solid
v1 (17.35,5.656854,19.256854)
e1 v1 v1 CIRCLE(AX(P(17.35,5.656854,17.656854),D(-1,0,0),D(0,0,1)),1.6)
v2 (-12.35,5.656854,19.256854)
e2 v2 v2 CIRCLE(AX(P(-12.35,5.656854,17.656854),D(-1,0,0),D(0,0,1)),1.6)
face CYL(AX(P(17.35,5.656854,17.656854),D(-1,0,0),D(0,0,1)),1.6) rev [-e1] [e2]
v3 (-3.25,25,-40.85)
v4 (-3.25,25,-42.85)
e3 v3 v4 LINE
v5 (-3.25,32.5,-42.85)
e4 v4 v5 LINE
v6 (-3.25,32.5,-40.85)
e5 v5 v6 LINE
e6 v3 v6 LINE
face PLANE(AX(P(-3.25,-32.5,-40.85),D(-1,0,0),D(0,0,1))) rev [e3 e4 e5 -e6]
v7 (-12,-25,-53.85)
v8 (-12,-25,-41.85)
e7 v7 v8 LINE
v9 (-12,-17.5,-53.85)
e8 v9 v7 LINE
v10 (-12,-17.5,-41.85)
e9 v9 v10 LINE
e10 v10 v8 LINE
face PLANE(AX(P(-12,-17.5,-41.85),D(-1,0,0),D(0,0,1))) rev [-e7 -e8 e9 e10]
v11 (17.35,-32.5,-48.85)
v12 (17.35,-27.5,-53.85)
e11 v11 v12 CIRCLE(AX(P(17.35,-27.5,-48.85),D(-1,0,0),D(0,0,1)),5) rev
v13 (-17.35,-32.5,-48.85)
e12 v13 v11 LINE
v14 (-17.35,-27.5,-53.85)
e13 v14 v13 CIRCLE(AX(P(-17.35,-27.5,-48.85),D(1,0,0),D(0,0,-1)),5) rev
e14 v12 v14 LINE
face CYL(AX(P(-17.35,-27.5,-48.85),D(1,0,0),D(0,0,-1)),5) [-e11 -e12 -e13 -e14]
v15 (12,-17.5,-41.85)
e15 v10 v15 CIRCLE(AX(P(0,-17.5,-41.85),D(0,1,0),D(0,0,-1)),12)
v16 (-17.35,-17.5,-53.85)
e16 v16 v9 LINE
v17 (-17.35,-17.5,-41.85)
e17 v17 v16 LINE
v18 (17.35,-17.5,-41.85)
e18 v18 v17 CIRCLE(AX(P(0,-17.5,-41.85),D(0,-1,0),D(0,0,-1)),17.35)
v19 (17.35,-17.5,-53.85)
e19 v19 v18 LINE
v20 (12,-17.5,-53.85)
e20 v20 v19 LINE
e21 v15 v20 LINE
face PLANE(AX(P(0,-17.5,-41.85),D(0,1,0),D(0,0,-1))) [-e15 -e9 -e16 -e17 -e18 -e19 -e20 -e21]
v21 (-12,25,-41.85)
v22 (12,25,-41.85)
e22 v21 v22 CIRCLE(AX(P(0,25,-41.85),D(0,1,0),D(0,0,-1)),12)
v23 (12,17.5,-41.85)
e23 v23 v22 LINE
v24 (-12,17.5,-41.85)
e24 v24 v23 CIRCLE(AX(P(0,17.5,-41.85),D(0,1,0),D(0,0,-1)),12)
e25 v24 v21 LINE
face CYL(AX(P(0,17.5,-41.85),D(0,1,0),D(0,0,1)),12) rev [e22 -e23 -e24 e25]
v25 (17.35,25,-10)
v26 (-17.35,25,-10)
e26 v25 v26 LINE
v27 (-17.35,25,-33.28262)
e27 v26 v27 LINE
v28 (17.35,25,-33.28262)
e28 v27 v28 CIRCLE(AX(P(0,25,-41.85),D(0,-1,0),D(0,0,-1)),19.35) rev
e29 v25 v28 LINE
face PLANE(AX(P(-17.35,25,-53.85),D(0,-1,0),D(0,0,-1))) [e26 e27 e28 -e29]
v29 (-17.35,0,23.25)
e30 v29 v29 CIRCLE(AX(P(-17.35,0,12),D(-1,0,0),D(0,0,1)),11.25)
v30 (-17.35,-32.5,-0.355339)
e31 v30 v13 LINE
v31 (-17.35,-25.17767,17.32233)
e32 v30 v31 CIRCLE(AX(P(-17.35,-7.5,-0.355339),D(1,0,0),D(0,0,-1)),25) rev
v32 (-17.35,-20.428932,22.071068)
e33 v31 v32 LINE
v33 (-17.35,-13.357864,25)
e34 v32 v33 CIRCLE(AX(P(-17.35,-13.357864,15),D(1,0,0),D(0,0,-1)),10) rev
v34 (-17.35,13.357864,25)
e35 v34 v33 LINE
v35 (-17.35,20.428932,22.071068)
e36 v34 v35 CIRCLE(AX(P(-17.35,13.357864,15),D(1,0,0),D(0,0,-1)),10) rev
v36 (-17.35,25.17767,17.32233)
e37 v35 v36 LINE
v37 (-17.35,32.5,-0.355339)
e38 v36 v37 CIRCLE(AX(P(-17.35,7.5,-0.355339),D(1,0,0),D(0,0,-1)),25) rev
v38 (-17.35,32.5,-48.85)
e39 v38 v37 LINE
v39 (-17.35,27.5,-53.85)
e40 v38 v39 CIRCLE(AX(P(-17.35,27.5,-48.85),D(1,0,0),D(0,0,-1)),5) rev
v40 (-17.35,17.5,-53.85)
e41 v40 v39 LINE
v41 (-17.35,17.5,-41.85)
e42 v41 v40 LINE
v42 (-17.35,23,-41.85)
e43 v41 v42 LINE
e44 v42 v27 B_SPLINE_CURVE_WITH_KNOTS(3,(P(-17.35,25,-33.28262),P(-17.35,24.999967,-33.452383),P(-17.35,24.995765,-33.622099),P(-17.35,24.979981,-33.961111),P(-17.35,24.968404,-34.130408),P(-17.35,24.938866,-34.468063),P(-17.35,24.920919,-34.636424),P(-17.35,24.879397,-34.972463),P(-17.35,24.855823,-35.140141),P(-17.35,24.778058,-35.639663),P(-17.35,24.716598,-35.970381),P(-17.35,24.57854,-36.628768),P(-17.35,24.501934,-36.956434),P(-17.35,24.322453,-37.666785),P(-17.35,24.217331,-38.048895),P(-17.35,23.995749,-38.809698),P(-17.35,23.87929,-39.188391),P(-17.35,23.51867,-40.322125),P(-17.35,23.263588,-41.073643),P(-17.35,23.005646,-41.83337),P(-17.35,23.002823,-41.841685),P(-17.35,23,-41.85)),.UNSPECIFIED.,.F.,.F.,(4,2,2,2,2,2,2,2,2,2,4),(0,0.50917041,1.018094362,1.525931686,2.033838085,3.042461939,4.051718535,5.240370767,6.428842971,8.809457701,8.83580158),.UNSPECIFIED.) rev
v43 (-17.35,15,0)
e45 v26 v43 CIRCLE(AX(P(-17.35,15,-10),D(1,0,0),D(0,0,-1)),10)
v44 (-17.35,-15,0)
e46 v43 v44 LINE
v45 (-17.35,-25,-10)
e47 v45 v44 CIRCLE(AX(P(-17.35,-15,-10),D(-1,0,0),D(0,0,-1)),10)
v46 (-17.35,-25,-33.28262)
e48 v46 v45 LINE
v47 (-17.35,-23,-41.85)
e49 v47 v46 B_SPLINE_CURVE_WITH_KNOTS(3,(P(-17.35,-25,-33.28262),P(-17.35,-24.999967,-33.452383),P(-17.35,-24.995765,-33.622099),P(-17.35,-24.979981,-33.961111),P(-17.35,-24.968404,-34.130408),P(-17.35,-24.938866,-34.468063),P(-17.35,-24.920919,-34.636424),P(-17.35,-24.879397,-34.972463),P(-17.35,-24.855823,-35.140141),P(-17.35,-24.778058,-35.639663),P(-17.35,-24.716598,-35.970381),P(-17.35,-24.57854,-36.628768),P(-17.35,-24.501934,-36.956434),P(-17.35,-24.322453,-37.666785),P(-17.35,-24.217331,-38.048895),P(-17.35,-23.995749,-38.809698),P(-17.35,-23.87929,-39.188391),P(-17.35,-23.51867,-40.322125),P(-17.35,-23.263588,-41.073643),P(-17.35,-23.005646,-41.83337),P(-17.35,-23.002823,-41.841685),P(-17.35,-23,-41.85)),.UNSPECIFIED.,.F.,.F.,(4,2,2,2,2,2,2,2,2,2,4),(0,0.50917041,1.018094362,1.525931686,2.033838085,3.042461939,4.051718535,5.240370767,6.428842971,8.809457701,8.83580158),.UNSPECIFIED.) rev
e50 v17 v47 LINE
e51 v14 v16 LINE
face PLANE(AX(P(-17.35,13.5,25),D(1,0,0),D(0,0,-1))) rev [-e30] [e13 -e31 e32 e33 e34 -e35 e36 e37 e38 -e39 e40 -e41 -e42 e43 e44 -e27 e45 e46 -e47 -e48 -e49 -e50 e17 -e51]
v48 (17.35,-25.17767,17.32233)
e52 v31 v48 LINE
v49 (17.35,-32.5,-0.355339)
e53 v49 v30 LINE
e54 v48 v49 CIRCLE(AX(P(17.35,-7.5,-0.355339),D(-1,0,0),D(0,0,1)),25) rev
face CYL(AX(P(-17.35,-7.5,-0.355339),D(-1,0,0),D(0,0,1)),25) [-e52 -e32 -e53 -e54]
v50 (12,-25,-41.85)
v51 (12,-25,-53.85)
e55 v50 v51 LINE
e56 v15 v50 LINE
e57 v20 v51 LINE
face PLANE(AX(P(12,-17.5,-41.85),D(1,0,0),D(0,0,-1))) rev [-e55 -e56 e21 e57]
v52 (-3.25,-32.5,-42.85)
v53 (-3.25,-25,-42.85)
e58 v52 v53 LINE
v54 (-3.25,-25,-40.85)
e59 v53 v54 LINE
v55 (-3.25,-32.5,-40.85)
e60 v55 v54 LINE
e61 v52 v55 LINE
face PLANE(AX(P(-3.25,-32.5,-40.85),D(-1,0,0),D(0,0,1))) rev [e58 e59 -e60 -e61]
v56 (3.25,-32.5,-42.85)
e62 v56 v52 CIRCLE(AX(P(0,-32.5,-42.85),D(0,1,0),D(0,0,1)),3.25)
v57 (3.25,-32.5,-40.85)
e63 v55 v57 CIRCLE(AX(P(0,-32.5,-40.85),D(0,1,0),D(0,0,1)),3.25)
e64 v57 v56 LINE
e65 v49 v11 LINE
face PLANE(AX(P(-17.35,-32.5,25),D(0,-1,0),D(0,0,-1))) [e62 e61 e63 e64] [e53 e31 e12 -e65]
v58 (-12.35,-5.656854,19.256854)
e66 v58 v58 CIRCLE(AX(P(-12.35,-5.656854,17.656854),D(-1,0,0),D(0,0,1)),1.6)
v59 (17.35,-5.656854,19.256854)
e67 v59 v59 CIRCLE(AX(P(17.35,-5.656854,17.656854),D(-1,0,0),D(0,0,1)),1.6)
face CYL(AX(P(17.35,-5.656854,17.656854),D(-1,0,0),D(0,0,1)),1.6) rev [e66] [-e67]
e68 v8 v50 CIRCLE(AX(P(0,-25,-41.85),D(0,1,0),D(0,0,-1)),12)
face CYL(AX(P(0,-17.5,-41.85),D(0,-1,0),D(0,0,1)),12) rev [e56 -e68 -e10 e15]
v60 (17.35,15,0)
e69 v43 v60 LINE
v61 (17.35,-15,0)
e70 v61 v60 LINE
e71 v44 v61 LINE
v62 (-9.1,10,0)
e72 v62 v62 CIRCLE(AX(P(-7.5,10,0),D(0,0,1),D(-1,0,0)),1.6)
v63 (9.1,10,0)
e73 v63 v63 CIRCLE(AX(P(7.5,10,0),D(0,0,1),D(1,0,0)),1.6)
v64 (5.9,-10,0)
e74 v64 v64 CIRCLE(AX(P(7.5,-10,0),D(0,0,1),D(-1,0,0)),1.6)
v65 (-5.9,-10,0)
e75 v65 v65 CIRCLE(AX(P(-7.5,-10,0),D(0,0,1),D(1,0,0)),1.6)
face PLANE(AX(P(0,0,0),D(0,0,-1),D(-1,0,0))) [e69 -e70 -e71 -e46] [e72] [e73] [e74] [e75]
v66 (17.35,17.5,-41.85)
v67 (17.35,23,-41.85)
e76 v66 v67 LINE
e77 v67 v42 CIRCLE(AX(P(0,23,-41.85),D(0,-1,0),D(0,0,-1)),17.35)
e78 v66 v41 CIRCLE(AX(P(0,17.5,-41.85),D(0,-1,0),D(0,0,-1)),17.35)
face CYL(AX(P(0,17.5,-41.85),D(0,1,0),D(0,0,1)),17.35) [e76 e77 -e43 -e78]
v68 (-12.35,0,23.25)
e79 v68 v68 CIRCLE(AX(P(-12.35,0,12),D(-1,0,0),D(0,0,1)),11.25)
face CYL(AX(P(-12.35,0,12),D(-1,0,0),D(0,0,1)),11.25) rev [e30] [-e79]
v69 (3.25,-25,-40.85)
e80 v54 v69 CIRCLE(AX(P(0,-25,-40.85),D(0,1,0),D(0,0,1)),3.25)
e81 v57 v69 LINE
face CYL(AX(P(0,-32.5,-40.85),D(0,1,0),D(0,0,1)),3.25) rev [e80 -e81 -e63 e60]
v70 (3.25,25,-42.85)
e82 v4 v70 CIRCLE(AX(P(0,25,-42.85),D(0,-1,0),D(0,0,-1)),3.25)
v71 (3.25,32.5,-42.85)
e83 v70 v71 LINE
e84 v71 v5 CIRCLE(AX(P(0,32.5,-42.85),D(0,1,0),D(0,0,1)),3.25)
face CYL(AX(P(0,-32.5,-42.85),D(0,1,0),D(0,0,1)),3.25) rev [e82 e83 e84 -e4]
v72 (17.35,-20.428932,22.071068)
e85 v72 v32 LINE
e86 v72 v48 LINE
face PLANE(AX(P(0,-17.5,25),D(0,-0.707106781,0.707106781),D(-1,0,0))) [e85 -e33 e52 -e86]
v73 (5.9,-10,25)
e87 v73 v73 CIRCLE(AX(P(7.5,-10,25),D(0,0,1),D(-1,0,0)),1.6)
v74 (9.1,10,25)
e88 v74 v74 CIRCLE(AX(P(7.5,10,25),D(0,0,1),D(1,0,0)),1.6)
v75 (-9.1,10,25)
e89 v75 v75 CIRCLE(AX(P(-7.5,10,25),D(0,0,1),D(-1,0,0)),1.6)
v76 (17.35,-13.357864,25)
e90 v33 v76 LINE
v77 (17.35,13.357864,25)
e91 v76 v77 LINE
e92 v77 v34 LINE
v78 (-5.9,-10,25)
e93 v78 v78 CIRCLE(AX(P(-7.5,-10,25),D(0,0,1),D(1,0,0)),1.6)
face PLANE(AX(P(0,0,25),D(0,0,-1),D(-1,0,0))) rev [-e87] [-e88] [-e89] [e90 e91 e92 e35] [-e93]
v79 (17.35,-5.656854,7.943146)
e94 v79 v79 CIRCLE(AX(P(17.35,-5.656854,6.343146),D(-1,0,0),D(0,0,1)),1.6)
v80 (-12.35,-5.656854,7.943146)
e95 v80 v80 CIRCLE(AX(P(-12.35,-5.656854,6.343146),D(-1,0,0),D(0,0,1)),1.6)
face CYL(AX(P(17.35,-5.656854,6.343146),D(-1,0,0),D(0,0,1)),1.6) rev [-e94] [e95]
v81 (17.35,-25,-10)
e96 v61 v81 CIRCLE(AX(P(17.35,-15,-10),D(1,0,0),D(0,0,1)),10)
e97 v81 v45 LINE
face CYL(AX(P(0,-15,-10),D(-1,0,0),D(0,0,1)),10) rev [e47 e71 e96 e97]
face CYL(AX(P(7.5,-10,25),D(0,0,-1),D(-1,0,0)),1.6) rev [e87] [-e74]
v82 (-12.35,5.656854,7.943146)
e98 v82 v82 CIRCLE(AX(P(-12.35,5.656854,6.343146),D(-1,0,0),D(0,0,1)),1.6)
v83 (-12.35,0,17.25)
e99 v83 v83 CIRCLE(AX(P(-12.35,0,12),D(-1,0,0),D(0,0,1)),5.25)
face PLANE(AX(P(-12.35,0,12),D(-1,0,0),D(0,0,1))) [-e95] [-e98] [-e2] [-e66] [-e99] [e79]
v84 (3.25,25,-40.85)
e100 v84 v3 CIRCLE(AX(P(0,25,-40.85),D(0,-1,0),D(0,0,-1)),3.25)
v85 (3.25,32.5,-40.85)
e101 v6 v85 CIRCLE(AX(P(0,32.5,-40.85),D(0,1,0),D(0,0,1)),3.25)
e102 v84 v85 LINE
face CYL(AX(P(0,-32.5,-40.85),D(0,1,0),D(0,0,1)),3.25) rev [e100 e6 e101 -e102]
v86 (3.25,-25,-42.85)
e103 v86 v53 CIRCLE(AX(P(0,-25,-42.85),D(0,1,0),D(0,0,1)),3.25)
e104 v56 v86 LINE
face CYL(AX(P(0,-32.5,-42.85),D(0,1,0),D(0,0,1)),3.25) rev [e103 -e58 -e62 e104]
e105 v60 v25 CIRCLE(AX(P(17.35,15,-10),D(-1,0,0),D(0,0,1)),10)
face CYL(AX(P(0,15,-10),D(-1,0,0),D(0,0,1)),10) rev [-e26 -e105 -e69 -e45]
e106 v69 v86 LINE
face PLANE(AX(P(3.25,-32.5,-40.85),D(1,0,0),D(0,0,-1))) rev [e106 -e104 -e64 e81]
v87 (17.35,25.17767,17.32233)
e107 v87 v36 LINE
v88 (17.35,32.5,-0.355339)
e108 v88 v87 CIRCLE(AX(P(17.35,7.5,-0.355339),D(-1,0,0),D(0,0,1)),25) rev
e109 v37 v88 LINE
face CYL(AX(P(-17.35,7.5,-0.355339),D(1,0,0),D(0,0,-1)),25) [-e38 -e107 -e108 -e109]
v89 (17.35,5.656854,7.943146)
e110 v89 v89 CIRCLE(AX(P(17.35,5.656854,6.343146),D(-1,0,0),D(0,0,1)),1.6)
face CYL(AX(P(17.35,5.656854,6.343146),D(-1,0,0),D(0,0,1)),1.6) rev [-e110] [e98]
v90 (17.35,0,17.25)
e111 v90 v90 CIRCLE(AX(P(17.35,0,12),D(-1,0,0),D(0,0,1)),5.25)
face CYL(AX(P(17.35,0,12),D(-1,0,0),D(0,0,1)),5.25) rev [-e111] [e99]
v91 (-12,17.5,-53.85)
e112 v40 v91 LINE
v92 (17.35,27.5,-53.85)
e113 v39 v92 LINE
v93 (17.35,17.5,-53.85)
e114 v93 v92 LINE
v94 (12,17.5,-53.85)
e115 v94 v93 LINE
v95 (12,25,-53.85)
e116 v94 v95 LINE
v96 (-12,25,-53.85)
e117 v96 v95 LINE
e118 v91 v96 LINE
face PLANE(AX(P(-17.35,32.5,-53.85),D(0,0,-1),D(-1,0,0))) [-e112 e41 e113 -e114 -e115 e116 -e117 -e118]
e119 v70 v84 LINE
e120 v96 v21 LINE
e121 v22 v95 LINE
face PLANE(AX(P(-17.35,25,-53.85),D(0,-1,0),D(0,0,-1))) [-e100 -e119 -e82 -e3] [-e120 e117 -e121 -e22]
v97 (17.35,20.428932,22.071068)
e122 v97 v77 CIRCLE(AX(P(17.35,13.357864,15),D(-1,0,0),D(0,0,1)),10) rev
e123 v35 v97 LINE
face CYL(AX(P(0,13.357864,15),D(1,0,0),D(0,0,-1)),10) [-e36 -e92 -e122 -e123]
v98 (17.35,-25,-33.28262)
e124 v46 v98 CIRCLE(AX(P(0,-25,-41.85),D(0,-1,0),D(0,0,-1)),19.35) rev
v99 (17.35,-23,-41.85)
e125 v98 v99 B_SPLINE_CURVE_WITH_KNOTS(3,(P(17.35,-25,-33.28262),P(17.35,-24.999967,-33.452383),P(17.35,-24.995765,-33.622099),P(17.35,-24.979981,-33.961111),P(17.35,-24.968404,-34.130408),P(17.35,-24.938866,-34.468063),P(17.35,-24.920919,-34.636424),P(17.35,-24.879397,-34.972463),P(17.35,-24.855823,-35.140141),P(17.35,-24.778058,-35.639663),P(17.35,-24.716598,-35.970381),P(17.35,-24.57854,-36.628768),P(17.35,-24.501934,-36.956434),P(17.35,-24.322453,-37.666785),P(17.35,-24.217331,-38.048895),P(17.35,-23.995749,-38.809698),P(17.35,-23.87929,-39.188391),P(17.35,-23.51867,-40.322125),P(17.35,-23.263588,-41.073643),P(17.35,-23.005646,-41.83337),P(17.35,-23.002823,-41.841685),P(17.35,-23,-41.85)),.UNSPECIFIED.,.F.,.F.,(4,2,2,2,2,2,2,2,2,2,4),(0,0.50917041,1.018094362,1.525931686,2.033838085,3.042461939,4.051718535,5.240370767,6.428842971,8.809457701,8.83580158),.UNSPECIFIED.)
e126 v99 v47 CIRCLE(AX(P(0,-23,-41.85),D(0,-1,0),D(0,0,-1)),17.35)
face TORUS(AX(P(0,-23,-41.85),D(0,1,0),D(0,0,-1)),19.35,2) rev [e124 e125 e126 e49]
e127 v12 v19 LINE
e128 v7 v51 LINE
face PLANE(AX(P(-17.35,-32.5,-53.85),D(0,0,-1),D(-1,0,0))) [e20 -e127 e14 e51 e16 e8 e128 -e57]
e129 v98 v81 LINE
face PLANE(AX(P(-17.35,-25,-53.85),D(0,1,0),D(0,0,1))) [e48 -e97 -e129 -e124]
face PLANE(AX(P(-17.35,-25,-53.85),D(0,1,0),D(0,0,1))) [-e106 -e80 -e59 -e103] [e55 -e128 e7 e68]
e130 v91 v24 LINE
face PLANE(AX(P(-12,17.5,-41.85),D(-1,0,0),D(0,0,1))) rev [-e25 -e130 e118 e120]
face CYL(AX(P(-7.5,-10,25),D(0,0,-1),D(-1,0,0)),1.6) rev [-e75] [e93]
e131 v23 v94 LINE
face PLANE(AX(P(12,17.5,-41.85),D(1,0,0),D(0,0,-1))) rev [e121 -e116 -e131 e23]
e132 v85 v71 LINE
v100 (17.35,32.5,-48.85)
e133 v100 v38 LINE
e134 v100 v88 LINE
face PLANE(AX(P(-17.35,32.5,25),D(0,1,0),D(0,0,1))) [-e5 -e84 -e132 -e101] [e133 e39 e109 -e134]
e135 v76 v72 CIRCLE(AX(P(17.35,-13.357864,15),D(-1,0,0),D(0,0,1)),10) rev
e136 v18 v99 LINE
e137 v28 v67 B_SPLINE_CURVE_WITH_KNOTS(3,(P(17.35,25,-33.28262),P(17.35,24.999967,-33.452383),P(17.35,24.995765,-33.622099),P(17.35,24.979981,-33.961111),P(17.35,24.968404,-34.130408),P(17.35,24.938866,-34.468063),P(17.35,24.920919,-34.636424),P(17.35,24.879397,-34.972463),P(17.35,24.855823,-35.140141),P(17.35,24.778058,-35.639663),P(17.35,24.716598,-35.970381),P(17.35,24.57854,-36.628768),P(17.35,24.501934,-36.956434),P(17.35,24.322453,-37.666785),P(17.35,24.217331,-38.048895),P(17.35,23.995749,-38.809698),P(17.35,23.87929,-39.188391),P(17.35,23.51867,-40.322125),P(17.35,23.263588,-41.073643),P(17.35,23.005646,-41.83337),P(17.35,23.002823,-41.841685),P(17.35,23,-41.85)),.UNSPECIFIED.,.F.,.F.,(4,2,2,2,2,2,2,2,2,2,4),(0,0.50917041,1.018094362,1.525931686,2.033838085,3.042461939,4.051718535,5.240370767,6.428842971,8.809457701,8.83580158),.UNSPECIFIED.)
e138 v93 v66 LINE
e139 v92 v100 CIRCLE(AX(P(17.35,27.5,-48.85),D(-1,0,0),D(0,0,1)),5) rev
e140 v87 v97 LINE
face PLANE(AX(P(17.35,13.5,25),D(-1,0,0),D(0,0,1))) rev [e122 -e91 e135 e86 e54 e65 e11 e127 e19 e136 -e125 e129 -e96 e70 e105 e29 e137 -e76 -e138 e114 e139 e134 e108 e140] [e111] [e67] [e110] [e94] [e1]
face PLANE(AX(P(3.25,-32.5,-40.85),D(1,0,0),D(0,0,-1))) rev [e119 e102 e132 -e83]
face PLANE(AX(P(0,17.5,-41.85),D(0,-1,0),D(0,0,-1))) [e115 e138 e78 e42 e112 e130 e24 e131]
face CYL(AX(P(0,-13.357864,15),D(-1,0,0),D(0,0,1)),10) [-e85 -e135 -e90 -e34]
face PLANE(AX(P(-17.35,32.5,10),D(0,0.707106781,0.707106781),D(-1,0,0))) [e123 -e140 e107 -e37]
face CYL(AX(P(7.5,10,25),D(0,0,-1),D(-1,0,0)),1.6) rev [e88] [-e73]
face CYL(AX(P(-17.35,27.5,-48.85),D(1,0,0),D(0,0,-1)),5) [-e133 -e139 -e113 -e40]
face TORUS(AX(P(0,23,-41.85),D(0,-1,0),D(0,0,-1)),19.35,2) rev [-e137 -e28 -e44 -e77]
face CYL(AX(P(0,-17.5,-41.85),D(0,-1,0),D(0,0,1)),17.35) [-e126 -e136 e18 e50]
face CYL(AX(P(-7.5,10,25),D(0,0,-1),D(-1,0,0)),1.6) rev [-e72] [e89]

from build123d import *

# Parameters (mm, degrees)
SKETCH1_W               = 34.7
SKETCH1_H               = 27
SKETCH1_R               = 1.6
BOSS_EXTRUDE1_DEPTH     = 25
SKETCH4_R               = 1.6
SKETCH4_R_2             = 5.25
BASE_EXTRUDE_DEPTH      = 45.847965394
SKETCH4_3_R             = 11.25
SKETCH4_3_R_2           = 5.25
SKETCH4_3_R_3           = 1.6
CUT_EXTRUDE3_DEPTH      = 5
BOSS_EXTRUDE5_DEPTH     = 34.7
CHAMFER3_SIZE           = 12.5
CHAMFER3_SIZE2          = 15
FILLET1_R               = 10
FILLET3_R               = 20
FILLET4_R               = 7.5
BOSS_EXTRUDE6_DEPTH     = 7.5
FILLET5_R               = 2
SKETCH13_R              = 3.25
CUT_EXTRUDE5_DEPTH      = 18.5
CHAMFER4_SIZE           = 15
FILLET11_R              = 10
FILLET12_R              = 25
FILLET13_R              = 5
CUT_EXTRUDE6_DEPTH      = 66.246417783
CUT_EXTRUDE6_DEPTH_BACK = 66.246417783


with BuildPart() as part:
    # Sketch1 → Boss-Extrude1 (new body)
    with BuildSketch(Plane.XY):
        Rectangle(SKETCH1_W, SKETCH1_H)
        with Locations((-7.5, -10)):
            Circle(SKETCH1_R, mode=Mode.SUBTRACT)
        with Locations(Location((7.5, -10, 0), (0, 0, 180))):
            Circle(SKETCH1_R, mode=Mode.SUBTRACT)
        with Locations((7.5, 10)):
            Circle(SKETCH1_R, mode=Mode.SUBTRACT)
        with Locations(Location((-7.5, 10, 0), (0, 0, 180))):
            Circle(SKETCH1_R, mode=Mode.SUBTRACT)
    extrude(amount=BOSS_EXTRUDE1_DEPTH)

    # Sketch4 → Base Extrude (cut, through all)
    with BuildSketch(Plane.ZY.offset(17.35)):
        with Locations((6.343145751, 5.656854249)):
            Circle(SKETCH4_R)
        with Locations((17.656854249, 5.656854249)):
            Circle(SKETCH4_R)
        with Locations((17.656854249, -5.656854249)):
            Circle(SKETCH4_R)
        with Locations((6.343145751, -5.656854249)):
            Circle(SKETCH4_R)
        with Locations((12, 0)):
            Circle(SKETCH4_R_2)
    extrude(amount=-BASE_EXTRUDE_DEPTH, mode=Mode.SUBTRACT)

    # Sketch4<3> → Cut-Extrude3 (cut)
    with BuildSketch(Plane.ZY.offset(17.35)):
        with Locations((12, 0)):
            Circle(SKETCH4_3_R)
        with Locations((12, 0)):
            Circle(SKETCH4_3_R_2, mode=Mode.SUBTRACT)
        with Locations((6.343145751, 5.656854249)):
            Circle(SKETCH4_3_R_3, mode=Mode.SUBTRACT)
        with Locations((17.656854249, 5.656854249)):
            Circle(SKETCH4_3_R_3, mode=Mode.SUBTRACT)
        with Locations((17.656854249, -5.656854249)):
            Circle(SKETCH4_3_R_3, mode=Mode.SUBTRACT)
        with Locations((6.343145751, -5.656854249)):
            Circle(SKETCH4_3_R_3, mode=Mode.SUBTRACT)
    extrude(amount=-CUT_EXTRUDE3_DEPTH, mode=Mode.SUBTRACT)

    # Sketch10 → Boss-Extrude5 (add)
    with BuildSketch(Plane(origin=(17.35, 0, 0), x_dir=(0, 0, -1), z_dir=(1, 0, 0))):
        Polygon((0, 13.5), (0, 25), (53.849999999, 25), (53.849999999, 32.5), (-25, 32.5), (-25, 13.5), align=None)
        Polygon((-25, -13.5), (-25, -32.5), (53.849999999, -32.5), (53.849999999, -25), (0, -25), (0, -13.5), align=None)
    extrude(amount=-BOSS_EXTRUDE5_DEPTH)

    # Chamfer3
    chamfer3_edges = [part.edges().sort_by_distance(p)[0] for p in [
        (0, 32.5, 25),
    ]]
    chamfer3_side = [part.faces().sort_by_distance(p)[0] for p in [
        (0, 0, 25),
    ]]
    chamfer(chamfer3_edges, length=CHAMFER3_SIZE, length2=CHAMFER3_SIZE2, reference=chamfer3_side[0])

    # Fillet1
    fillet1_edges = [part.edges().sort_by_distance(p)[0] for p in [
        (0, 25, 0),
    ]]
    fillet(fillet1_edges, radius=FILLET1_R)

    # Fillet3
    fillet3_edges = [part.edges().sort_by_distance(p)[0] for p in [
        (0, 32.5, 10),
    ]]
    fillet(fillet3_edges, radius=FILLET3_R)

    # Fillet4
    fillet4_edges = [part.edges().sort_by_distance(p)[0] for p in [
        (0, 20, 25),
    ]]
    fillet(fillet4_edges, radius=FILLET4_R)

    # Sketch11 → Boss-Extrude6 (add)
    with BuildSketch(Plane.XZ.offset(-25)):
        with BuildLine():
            Line((-12, -53.849999999), (-17.35, -53.849999999))
            Line((-17.35, -53.849999999), (-17.35, -41.849999999))
            ThreePointArc((-17.35, -41.849999999), (0, -24.499999999), (17.35, -41.849999999))
            Line((17.35, -41.849999999), (17.35, -53.849999999))
            Line((17.35, -53.849999999), (12, -53.849999999))
            Line((12, -53.849999999), (12, -41.849999999))
            ThreePointArc((12, -41.849999999), (0, -29.849999999), (-12, -41.849999999))
            Line((-12, -41.849999999), (-12, -53.849999999))
        make_face()
    extrude(amount=BOSS_EXTRUDE6_DEPTH)

    # Fillet5
    # the kernel refuses this fillet: 2 mm, written as the material it adds along each edge
    with BuildSketch(Plane(origin=(0, 25, -41.849999999), x_dir=(-0.9586337455117862, 0, -0.28464248095820854), z_dir=(0.28464248095820854, 0, -0.9586337455117862))) as fillet5_piece_1_section:
        with BuildLine():
            CenterArc((19.3499, -1.9999), FILLET5_R, 90, 90)
            Line((17.3499, -1.9999), (17.3099, -1.9999))
            ThreePointArc((17.3099, -1.9999), (17.31, -0.99995), (17.31, 0))
            Line((17.31, 0), (17.35, 0.04))
            ThreePointArc((17.35, 0.04), (18.34995, 0.04), (19.3499, 0.0401))
            Line((19.3499, 0.0401), (19.3499, 0.0001))
        make_face()
    fillet5_piece_1 = revolve(axis=Axis((0, 25, -41.849999999), (0, 1, 0)), revolution_arc=213.074958292, mode=Mode.PRIVATE)
    fillet5_piece_1 = split(fillet5_piece_1, bisect_by=Plane(origin=(17.35, 24.441377489, -23.941377488), z_dir=(-1, 0, 0)), keep=Keep.TOP, mode=Mode.PRIVATE)
    fillet5_piece_1 = split(fillet5_piece_1, bisect_by=Plane(origin=(-17.35, 24.441377489, -23.941377488), z_dir=(1, 0, 0)), keep=Keep.TOP, mode=Mode.PRIVATE)
    add(fillet5_piece_1)

    # Sketch13 → Cut-Extrude5 (cut)
    with BuildSketch(Plane.XZ.offset(-25)):
        with Locations(Location((0, -41.849999999, 0), (0, 0, 270))):
            Circle(SKETCH13_R)
    extrude(amount=-CUT_EXTRUDE5_DEPTH, mode=Mode.SUBTRACT)

    # Mirror12: part across plane


with BuildPart() as part_1:
    add(part.part)
    add(part.part.mirror(Plane.ZX))

    # Chamfer4
    chamfer4_edges = [part_1.edges().sort_by_distance(p)[0] for p in [
        (0, 32.5, 25),
        (0, -32.5, 25),
    ]]
    chamfer(chamfer4_edges, length=CHAMFER4_SIZE)

    # Fillet11
    fillet11_edges = [part_1.edges().sort_by_distance(p)[0] for p in [
        (0, 17.5, 25),
        (0, -17.5, 25),
    ]]
    fillet(fillet11_edges, radius=FILLET11_R)

    # Fillet12
    fillet12_edges = [part_1.edges().sort_by_distance(p)[0] for p in [
        (0, -32.5, 10),
        (0, 32.5, 10),
    ]]
    fillet(fillet12_edges, radius=FILLET12_R)

    # Fillet13
    fillet13_edges = [part_1.edges().sort_by_distance(p)[0] for p in [
        (0, 32.5, -53.849999999),
        (0, -32.5, -53.849999999),
    ]]
    fillet(fillet13_edges, radius=FILLET13_R)

    # Sketch14 → Cut-Extrude6 (cut, two sides: drawn at the far end of the back side and taken through both)
    with BuildSketch(Plane(origin=(0, 0, 0), x_dir=(1, 0, 0), z_dir=(0, 1, 0)).offset(-CUT_EXTRUDE6_DEPTH_BACK)):
        with BuildLine():
            Line((-3.25, 40.849999999), (-3.25, 42.849999999))
            ThreePointArc((-3.25, 42.849999999), (0, 46.099999999), (3.25, 42.849999999))
            Line((3.25, 42.849999999), (3.25, 40.849999999))
            ThreePointArc((3.25, 40.849999999), (0, 37.599999999), (-3.25, 40.849999999))
        make_face()
    extrude(amount=CUT_EXTRUDE6_DEPTH + CUT_EXTRUDE6_DEPTH_BACK, mode=Mode.SUBTRACT)


solid = part_1.part
